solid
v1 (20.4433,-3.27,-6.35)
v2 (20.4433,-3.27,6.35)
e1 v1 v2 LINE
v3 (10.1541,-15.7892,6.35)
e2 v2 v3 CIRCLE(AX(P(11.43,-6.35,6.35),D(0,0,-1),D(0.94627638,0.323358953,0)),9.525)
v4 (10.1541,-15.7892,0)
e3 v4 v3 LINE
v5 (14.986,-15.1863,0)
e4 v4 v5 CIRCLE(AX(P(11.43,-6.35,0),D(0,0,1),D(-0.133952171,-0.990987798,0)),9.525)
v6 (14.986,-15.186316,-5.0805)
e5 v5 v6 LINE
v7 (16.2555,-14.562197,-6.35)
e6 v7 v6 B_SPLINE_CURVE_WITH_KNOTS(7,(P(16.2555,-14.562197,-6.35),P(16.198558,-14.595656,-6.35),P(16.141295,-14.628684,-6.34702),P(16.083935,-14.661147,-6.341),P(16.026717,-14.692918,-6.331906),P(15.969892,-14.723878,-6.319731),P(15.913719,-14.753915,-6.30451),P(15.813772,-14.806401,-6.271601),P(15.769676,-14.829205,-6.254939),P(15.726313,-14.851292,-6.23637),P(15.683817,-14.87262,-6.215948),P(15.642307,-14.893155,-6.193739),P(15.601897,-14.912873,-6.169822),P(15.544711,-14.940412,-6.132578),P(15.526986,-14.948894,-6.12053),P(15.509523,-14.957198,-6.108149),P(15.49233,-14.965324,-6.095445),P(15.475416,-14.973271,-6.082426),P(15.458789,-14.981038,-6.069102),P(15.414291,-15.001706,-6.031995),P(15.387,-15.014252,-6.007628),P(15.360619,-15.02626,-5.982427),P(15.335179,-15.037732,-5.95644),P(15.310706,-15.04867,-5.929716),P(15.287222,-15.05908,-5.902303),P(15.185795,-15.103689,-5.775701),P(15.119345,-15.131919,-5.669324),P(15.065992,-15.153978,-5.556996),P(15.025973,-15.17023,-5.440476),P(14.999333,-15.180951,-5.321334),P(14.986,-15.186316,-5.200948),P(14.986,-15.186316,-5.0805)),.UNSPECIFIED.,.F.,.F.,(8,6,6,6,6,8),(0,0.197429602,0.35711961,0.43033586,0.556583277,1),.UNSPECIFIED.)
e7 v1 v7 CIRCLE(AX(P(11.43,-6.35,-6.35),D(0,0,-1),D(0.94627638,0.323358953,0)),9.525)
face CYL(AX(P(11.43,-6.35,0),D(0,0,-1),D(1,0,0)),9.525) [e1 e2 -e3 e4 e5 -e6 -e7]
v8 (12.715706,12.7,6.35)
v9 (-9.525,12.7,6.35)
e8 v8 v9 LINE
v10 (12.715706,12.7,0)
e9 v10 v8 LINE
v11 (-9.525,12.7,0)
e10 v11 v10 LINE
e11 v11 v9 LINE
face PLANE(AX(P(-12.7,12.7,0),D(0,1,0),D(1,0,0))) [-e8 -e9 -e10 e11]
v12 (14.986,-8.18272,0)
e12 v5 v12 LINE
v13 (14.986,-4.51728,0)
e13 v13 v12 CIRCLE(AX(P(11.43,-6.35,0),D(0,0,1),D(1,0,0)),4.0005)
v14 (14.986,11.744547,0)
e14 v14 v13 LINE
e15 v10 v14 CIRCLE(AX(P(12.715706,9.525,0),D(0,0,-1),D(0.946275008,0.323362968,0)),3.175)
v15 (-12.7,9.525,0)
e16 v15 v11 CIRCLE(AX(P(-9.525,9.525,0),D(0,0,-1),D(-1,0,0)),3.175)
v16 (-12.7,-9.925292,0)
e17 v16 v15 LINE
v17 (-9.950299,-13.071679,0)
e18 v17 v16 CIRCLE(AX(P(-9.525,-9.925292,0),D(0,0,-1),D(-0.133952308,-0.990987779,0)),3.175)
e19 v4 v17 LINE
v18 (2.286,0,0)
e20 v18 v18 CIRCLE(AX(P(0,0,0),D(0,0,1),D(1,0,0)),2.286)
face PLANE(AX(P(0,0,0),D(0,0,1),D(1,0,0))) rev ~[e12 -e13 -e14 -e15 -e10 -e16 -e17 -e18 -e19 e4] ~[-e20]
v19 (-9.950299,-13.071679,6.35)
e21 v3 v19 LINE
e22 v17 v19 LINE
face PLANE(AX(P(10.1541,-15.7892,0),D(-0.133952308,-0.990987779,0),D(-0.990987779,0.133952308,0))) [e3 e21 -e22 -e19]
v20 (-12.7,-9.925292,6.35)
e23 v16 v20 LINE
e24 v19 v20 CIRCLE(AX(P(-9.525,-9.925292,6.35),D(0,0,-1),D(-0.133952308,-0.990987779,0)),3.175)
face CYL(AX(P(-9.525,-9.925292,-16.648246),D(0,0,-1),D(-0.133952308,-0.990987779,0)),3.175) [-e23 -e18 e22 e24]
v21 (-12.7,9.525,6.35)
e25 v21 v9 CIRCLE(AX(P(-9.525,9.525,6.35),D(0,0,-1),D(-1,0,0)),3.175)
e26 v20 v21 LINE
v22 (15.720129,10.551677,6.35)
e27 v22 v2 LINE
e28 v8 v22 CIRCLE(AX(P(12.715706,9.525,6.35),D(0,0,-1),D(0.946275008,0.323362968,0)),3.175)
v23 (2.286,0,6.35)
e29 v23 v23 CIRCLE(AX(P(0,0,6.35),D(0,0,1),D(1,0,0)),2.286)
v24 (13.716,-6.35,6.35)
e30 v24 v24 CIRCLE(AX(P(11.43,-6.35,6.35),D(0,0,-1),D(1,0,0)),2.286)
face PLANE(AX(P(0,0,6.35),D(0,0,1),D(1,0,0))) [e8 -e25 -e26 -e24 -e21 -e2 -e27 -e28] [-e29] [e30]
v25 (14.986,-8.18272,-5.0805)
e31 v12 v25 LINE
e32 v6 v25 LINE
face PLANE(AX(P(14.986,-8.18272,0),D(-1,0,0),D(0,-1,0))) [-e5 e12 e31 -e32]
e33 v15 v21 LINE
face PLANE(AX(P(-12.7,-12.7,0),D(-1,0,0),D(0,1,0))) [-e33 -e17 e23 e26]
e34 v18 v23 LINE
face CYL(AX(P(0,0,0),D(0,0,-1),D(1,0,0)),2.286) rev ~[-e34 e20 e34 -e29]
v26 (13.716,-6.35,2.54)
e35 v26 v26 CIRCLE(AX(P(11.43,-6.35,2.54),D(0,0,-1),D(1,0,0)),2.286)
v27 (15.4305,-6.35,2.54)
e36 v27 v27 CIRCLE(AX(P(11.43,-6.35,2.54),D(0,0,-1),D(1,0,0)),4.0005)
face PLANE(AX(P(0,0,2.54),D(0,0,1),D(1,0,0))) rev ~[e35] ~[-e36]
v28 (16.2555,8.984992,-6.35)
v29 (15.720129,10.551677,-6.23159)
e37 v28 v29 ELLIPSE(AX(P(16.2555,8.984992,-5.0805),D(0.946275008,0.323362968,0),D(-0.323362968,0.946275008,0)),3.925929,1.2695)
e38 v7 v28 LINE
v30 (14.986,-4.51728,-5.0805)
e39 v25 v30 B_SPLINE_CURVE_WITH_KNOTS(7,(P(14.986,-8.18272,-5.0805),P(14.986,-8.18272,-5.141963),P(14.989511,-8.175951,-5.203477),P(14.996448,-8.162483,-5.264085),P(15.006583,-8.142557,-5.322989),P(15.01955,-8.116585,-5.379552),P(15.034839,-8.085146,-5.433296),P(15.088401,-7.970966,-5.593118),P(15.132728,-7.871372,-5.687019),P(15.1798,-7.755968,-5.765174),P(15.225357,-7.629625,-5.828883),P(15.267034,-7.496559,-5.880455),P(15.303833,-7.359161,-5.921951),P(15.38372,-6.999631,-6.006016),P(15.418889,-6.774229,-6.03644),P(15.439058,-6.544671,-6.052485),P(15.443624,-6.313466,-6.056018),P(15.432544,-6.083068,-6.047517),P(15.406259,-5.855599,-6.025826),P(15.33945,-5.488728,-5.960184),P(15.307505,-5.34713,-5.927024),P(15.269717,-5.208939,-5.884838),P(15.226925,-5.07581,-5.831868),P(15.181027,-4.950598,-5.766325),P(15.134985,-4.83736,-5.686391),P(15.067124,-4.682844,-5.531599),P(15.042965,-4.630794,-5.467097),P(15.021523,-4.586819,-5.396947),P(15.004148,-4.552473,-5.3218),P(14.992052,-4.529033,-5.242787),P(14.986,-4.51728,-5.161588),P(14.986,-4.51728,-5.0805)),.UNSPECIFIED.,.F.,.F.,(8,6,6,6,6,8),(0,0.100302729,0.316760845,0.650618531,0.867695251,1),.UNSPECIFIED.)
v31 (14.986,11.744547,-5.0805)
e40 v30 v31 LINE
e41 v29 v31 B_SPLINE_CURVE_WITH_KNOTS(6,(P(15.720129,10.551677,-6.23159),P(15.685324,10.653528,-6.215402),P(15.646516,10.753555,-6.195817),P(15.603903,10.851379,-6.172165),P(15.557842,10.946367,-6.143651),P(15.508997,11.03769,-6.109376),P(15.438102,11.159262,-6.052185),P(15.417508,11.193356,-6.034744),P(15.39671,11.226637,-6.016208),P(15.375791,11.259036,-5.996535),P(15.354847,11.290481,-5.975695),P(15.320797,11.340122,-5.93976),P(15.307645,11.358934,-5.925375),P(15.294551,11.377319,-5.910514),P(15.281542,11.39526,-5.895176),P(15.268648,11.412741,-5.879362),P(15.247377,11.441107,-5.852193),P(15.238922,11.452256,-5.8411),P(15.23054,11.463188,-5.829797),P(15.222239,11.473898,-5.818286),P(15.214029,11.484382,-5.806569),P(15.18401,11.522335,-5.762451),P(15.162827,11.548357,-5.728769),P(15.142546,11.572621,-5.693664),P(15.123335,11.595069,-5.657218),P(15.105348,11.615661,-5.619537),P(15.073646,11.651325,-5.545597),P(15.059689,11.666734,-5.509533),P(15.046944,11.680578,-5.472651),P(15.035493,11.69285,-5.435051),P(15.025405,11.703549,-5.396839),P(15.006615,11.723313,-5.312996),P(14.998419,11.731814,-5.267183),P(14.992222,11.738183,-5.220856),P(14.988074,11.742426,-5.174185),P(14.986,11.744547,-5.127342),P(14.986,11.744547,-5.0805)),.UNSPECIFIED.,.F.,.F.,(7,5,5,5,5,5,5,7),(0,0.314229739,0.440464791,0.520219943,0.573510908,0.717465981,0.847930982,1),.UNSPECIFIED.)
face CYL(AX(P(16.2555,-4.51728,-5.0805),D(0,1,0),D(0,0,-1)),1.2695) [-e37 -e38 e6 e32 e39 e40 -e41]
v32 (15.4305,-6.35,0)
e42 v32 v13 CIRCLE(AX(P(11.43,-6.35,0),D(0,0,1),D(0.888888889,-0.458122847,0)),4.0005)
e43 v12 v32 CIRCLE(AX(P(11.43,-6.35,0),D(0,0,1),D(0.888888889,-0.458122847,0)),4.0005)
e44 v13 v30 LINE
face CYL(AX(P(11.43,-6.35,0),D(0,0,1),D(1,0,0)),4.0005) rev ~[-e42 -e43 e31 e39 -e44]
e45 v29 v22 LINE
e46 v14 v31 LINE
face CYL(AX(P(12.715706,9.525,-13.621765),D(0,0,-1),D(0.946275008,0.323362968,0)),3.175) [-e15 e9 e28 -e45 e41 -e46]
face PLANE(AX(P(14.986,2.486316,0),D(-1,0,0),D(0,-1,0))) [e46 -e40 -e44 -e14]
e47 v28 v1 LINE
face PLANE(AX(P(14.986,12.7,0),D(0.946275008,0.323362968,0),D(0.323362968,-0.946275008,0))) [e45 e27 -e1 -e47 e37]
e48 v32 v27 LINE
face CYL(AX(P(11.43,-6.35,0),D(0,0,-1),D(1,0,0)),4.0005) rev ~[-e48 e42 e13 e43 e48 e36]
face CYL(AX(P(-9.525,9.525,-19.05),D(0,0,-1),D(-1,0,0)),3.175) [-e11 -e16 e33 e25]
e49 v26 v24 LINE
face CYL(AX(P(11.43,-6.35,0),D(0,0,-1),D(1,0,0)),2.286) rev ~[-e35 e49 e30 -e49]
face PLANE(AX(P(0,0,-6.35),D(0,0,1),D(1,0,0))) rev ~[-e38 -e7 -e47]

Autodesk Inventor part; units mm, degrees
ref_plane "YZ Plane" through (0, 0, 0) normal (1, 0, 0) x (0, 1, 0)
ref_plane "XZ Plane" through (0, 0, 0) normal (0, 1, 0) x (-1, 0, 0)
ref_plane "XY Plane" through (0, 0, 0) normal (0, 0, 1) x (1, 0, 0)
sketch "Sketch1" plane through (0, 0, 0) normal (0, 0, 1) x (1, 0, 0)
  line L0 (12.7, -12.7) -> (-12.7, -12.7)
  line L1 (-12.7, -12.7) -> (-12.7, 12.7)
  line L2 (-12.7, 12.7) -> (12.7, 12.7)
  line L3 (12.7, 12.7) -> (12.7, -12.7)
  line L4 (12.7, -12.7) -> (-12.7, 12.7) construction
  line L5 (-12.7, -12.7) -> (12.7, 12.7) construction
  circle A0 centre (11.43, -6.35) radius 9.525
  line L6 (12.7, 12.7) -> (14.986, 12.7)
  line L7 (14.986, 12.7) -> (14.986, -15.1863)
  line L8 (14.986, -12.7) -> (12.7, -12.7)
  line L9 (12.7, -12.7) -> (12.7, 12.7) construction
  line L10 (6.6364, -7.4249) -> (8.1023, -2.736) construction
  line L11 (8.1023, -2.736) -> (12.8959, -1.6611) construction
  line L12 (12.8959, -1.6611) -> (16.2236, -5.2751) construction
  line L13 (16.2236, -5.2751) -> (14.7577, -9.964) construction
  line L14 (14.7577, -9.964) -> (9.9641, -11.0389) construction
  line L15 (9.9641, -11.0389) -> (6.6364, -7.4249) construction
  circle A1 centre (11.43, -6.35) radius 2.286
  circle A2 centre (11.43, -6.35) radius 4.0005
  circle A3 centre (0, 0) radius 2.286
  line L16 (10.1541, -15.7892) -> (-12.7, -12.7)
  line L17 (14.986, 12.7) -> (20.4433, -3.27)
  point P0 (14.986, -9.2337)
  point P1 (14.986, -4.5173)
  point P2 (14.986, -8.1827)
  point P3 (12.1553, 12.7)
  point P4 (-5.8053, 12.7)
  point P5 (4.3305, -12.7)
  point P6 (12.7, 3.09)
  point P7 (14.986, 2.4863)
  dimension "d0" = 25.4
  dimension "d1" = 25.4
  dimension "d3" = 19.05
  dimension "d5" = 8.509
  dimension "d6" = 4.572
  dimension "d13" = 8.001
  dimension "d17" = 4.572
  dimension "d19" = 2.286
  dimension "d26" = 6.35
  dimension "d27" = 11.43
extrude "Extrusion1" add sketch "Sketch1" along normal blind 6.35 contours L8 L7 A0 L0 | L0 A0 L3 A2 | L3 A2 L7 L8 | A0 L16 L0 | L0 L1 L2 L3 A0 | A2 L3 A1 | L3 A1 A2 L7 | L7 A2 A0 | A0 L7 A2 L3 | L3 L6 L7 A0 | L7 A2 | L7 L17 A0
extrude "Extrusion2" add sketch "Sketch1" against normal blind 6.35 contours L7 A2 A0 | L7 L17 A0
extrude "Extrusion3" cut sketch "Sketch1" along normal blind 2.54 contours A2 L3 A1 | L3 A1 A2 L7 | L7 A2
fillet "Fillet2" radius 3.175 3 edges at (14.986, 12.7, 3.175) (-12.7, -12.7, 3.175) (-12.7, 12.7, 3.175)
fillet "Fillet1" radius 1.27 1 edges at (14.986, 3.6136, -6.35)
properties part number "Elevator Tensioner"
